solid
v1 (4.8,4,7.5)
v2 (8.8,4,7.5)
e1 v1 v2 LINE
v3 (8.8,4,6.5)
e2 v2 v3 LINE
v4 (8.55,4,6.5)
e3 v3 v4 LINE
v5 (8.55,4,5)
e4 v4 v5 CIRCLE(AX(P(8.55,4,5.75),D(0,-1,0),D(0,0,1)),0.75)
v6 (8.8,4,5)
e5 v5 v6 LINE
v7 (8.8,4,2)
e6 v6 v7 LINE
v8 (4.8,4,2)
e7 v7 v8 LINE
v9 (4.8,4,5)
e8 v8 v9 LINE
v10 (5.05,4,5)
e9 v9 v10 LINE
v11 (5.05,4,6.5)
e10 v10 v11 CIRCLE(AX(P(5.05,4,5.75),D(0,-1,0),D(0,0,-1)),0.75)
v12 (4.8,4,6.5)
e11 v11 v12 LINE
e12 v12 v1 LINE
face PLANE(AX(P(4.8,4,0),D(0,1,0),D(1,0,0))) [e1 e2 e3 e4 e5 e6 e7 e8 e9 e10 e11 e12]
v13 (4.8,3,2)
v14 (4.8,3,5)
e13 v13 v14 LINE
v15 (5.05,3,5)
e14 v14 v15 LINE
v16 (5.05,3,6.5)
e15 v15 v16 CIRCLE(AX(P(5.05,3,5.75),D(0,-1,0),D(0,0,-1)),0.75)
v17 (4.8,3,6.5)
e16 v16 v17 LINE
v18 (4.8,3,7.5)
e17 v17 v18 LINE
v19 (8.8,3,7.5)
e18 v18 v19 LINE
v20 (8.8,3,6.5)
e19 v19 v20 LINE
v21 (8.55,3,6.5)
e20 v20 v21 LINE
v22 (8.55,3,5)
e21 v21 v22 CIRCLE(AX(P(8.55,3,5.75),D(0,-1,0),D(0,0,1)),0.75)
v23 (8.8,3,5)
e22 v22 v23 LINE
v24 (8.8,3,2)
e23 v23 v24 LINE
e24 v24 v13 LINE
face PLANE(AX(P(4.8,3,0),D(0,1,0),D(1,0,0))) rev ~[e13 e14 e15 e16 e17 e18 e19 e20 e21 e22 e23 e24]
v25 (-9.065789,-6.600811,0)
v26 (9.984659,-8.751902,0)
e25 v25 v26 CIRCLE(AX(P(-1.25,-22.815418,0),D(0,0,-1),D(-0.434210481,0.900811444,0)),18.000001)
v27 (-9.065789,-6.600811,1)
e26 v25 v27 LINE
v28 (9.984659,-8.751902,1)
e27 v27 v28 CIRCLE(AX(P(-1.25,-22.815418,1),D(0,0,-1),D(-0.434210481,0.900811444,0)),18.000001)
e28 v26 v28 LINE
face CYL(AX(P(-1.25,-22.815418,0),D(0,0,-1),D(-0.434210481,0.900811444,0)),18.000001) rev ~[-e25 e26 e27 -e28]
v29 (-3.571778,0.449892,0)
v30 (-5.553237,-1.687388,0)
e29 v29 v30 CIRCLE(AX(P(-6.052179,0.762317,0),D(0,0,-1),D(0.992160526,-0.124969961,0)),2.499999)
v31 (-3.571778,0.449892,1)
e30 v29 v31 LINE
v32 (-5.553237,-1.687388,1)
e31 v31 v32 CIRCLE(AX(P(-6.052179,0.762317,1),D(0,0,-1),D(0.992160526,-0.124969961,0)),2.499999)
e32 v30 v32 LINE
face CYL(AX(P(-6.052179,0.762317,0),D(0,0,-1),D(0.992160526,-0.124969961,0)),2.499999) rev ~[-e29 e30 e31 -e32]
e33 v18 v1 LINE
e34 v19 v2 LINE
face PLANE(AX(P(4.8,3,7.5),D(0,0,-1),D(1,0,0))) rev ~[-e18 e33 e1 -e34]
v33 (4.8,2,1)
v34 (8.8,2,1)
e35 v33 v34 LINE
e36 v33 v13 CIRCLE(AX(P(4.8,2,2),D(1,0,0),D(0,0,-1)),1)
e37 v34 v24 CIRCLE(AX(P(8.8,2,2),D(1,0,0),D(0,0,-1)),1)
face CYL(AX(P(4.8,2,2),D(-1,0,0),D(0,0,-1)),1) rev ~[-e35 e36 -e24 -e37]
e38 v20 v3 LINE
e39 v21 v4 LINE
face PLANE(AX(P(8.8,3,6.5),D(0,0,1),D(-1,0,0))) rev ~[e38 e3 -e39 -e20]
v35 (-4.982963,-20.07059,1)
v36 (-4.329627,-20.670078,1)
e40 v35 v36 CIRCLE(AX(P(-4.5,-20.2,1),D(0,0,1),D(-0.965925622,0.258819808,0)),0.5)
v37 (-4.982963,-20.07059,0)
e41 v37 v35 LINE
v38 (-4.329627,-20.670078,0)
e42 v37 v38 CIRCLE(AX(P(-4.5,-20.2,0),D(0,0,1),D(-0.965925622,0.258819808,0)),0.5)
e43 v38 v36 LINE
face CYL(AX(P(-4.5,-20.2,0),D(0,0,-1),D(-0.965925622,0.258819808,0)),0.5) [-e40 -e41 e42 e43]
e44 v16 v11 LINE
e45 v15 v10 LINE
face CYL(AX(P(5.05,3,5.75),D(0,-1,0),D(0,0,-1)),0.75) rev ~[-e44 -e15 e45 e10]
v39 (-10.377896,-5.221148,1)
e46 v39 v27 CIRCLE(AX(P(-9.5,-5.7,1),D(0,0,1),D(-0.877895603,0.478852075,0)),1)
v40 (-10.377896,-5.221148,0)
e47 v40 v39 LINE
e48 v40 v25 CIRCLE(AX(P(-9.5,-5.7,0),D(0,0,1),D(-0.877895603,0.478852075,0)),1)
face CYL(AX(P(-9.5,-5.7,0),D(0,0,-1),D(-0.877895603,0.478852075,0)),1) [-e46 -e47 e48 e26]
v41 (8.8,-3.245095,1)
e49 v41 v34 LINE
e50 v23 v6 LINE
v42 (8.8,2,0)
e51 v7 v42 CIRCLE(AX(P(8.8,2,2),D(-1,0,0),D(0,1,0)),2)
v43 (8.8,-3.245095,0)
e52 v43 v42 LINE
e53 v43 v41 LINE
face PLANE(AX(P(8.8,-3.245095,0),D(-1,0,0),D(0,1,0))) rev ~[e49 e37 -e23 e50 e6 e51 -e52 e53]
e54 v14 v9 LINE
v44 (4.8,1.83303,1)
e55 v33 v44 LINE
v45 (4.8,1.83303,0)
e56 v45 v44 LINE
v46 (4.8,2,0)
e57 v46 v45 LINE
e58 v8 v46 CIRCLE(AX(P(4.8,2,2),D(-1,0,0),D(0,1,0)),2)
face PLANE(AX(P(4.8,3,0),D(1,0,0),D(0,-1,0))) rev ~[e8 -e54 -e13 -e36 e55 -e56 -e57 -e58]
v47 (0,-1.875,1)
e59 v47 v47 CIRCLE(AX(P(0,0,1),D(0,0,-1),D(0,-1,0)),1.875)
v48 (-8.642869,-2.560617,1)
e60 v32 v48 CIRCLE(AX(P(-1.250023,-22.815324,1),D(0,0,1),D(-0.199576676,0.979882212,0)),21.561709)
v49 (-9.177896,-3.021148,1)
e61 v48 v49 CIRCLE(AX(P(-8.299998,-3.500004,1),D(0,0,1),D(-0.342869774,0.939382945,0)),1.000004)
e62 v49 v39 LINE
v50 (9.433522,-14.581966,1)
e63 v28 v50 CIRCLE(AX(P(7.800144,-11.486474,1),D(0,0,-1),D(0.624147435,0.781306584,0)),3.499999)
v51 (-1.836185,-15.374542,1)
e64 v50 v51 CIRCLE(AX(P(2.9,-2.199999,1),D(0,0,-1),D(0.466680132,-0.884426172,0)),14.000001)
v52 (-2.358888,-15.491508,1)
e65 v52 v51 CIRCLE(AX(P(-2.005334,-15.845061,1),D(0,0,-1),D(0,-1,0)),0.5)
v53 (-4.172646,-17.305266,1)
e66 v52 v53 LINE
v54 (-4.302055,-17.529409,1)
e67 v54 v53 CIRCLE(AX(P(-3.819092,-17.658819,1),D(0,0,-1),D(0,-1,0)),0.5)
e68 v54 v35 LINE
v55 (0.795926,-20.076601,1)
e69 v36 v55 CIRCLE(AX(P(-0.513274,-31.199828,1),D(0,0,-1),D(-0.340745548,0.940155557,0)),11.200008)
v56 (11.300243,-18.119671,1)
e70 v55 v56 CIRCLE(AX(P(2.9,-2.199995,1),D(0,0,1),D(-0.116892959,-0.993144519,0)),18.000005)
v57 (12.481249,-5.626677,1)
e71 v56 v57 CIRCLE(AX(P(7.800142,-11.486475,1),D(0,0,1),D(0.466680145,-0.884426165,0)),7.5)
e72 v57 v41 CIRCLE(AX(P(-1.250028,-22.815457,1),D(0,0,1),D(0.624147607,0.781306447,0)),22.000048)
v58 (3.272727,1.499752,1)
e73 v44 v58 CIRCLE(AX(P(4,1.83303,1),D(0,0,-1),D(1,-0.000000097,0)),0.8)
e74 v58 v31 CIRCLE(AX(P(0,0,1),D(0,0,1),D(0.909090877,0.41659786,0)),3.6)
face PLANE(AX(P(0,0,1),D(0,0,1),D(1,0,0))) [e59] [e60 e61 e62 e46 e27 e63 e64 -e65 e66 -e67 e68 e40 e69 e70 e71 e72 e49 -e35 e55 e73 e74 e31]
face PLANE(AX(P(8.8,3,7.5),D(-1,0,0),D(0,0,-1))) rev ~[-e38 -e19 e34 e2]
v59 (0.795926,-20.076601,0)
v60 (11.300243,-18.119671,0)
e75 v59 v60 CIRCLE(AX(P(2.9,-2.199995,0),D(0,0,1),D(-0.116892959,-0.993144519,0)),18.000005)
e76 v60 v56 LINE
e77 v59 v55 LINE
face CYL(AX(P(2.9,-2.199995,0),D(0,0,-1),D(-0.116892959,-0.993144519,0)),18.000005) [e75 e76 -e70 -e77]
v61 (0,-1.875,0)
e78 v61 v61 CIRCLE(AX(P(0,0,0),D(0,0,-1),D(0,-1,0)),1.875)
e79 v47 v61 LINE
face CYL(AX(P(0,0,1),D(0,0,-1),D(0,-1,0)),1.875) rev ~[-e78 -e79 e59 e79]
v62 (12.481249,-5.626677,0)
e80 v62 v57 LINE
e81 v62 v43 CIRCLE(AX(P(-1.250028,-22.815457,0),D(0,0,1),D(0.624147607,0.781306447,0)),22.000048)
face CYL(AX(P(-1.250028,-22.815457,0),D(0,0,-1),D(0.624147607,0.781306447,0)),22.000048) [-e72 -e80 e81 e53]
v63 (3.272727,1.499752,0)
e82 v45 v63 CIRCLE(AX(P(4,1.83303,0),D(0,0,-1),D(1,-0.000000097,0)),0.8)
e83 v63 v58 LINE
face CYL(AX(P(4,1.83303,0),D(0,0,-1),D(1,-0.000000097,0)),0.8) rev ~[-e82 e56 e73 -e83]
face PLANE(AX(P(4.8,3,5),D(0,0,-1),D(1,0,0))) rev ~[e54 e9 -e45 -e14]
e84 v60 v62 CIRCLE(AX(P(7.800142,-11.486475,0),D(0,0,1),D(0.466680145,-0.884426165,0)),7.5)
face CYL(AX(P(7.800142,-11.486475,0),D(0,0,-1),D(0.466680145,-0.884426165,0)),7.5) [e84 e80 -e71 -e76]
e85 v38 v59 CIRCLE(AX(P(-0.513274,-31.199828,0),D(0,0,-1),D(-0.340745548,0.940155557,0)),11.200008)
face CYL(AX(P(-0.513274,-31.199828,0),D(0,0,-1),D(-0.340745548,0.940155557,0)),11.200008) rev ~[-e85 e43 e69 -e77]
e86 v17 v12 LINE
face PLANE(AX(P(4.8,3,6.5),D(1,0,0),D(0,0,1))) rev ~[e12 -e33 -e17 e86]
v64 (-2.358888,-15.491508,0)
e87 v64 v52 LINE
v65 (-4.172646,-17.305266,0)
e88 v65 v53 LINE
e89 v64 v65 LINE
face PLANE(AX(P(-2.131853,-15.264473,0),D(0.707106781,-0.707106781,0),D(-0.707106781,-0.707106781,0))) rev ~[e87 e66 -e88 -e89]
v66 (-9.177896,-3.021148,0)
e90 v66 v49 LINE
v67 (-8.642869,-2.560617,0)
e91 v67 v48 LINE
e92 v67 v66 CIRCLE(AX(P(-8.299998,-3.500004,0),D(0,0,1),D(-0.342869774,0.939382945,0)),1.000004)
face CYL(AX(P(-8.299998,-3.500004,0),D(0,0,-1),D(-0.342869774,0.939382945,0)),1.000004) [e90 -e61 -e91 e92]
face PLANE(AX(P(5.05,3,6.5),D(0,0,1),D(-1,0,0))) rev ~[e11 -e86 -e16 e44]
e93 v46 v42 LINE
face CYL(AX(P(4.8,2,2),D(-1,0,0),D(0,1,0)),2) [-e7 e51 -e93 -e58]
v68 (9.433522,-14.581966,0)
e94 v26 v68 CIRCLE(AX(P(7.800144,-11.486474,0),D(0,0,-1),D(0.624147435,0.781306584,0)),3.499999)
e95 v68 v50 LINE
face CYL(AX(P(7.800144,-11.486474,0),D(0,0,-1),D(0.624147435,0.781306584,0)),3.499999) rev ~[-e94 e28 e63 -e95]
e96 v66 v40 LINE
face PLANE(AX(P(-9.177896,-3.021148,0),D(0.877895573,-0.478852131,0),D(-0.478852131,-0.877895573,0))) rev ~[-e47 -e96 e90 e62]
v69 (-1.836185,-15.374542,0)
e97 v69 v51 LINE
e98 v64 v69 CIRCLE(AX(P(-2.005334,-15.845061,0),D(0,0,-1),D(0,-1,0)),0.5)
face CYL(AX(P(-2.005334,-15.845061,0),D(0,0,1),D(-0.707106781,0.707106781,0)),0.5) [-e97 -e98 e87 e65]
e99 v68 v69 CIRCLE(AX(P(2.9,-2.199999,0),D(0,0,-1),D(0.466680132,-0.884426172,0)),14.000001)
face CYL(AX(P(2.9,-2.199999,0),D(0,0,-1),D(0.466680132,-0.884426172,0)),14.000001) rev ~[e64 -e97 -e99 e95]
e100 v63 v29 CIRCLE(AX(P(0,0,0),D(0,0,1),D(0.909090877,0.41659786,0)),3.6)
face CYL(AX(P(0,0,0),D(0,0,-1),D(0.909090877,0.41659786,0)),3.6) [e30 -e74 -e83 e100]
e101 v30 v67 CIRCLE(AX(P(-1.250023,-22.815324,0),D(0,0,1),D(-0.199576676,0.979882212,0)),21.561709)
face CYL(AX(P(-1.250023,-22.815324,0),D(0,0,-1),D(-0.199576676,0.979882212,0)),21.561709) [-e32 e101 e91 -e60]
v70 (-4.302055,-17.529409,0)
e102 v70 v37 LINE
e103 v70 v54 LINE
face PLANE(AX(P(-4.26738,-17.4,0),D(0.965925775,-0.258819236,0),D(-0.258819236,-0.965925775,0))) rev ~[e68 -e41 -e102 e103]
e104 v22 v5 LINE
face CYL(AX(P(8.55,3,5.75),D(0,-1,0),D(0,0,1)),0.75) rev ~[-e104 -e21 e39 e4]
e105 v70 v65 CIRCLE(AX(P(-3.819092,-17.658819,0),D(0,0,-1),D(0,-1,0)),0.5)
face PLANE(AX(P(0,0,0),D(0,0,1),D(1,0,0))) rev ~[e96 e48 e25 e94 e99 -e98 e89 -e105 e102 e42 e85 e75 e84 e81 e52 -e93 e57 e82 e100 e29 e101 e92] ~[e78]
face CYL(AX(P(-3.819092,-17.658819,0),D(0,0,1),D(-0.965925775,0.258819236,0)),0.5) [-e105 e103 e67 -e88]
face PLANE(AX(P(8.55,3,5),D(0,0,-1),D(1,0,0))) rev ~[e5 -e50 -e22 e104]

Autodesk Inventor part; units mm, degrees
ref_plane "YZ Plane" through (0, 0, 0) normal (1, 0, 0) x (0, 1, 0)
ref_plane "XZ Plane" through (0, 0, 0) normal (0, 1, 0) x (-1, 0, 0)
ref_plane "XY Plane" through (0, 0, 0) normal (0, 0, 1) x (1, 0, 0)
sketch "Sketch1 outline for Plate1" plane through (0, 0, 0) normal (0, 0, 1) x (1, 0, 0)
  arc A0 (-4.982963, -20.07059) -> (-4.329627, -20.670078) centre (-4.5, -20.2) ccw
  arc A1 (-4.329627, -20.670078) -> (0.795926, -20.076601) centre (-0.513276, -31.19982) cw
  arc A2 (0.795926, -20.076601) -> (11.300243, -18.119671) centre (2.9, -2.2) ccw
  arc A3 (11.300243, -18.119671) -> (12.481249, -5.626677) centre (7.800142, -11.486475) ccw
  arc A4 (12.481249, -5.626677) -> (8.8, -3.245095) centre (-1.25, -22.815417) ccw
  line L0 (8.8, -3.245095) -> (8.8, 3)
  line L1 (8.8, 3) -> (4.8, 3)
  line L2 (4.8, 3) -> (4.8, 1.83303)
  arc A5 (4.8, 1.83303) -> (3.272727, 1.499752) centre (4, 1.83303) cw
  arc A6 (3.272727, 1.499752) -> (-3.571778, 0.449892) centre (0, 0) ccw
  arc A7 (-3.571778, 0.449892) -> (-5.553237, -1.687388) centre (-6.052179, 0.762317) cw
  arc A8 (-5.553237, -1.687388) -> (-8.642869, -2.560617) centre (-1.25, -22.815417) ccw
  arc A9 (-8.642869, -2.560617) -> (-9.177896, -3.021148) centre (-8.3, -3.5) ccw
  line L3 (-9.177896, -3.021148) -> (-10.377896, -5.221148)
  arc A10 (-10.377896, -5.221148) -> (-9.065789, -6.600811) centre (-9.5, -5.7) ccw
  arc A11 (-9.065789, -6.600811) -> (9.984659, -8.751902) centre (-1.25, -22.815417) cw
  arc A12 (9.984659, -8.751902) -> (9.433522, -14.581966) centre (7.800142, -11.486475) cw
  arc A13 (9.433522, -14.581966) -> (-2.131853, -15.264473) centre (2.9, -2.2) cw
  line L4 (-2.131853, -15.264473) -> (-4.26738, -17.4)
  line L5 (-4.26738, -17.4) -> (-4.982963, -20.07059)
extrude "Plate1" add sketch "Sketch1 outline for Plate1" along normal blind 1
sketch "Sketch2 outline for Plate2" plane through (4.8, 3, 0) normal (0, 1, 0) x (1, 0, 0)
  line L0 (4, -5) -> (4, 0)
  line L1 (3.75, -5) -> (4, -5)
  arc A0 (3.75, -6.5) -> (3.75, -5) centre (3.75, -5.75) cw
  line L2 (4, -6.5) -> (3.75, -6.5)
  line L3 (4, -7.5) -> (4, -6.5)
  line L4 (0, -7.5) -> (4, -7.5)
  line L5 (0, -6.5) -> (0, -7.5)
  line L6 (0.25, -6.5) -> (0, -6.5)
  arc A1 (0.25, -5) -> (0.25, -6.5) centre (0.25, -5.75) cw
  line L7 (0, -5) -> (0.25, -5)
  line L8 (0, 0) -> (0, -5)
  line L9 (4, 0) -> (0, 0)
sheet face with bend "Face2" sketch "Sketch2 outline for Plate2" thickness 1 toward (0, 1, 0) bend radius 1
bend "Bend1"
sketch "Sketch1" plane through (0, 0, 0) normal (0, 0, 1) x (1, 0, 0)
  arc A0 (3.272727, 1.499752) -> (-3.571778, 0.449892) centre (0, 0) ccw
  circle A1 centre (-8.3, -3.5) radius 1
  circle A2 centre (-9.5, -5.7) radius 1
  circle A3 centre (-4.5, -20.2) radius 0.5
  arc A4 (9.984659, -8.751902) -> (-9.065789, -6.600811) centre (-1.25, -22.815417) ccw
  line L0 (0, 0) -> (0, -25.191235) construction
  line L1 (-4.982963, -20.07059) -> (-4.26738, -17.4)
  line L2 (-4.26738, -17.4) -> (-2.131853, -15.264473)
  line L3 (-4.26738, -17.4) -> (1.767607, -17.4) construction
  arc A5 (-2.131853, -15.264473) -> (9.433522, -14.581966) centre (2.9, -2.2) ccw
  arc A6 (9.433522, -14.581966) -> (9.984659, -8.751902) centre (7.800142, -11.486475) ccw
  arc A7 (-5.553237, -1.687388) -> (-8.642869, -2.560617) centre (-1.25, -22.815417) ccw
  arc A8 (0.795926, -20.076601) -> (11.300243, -18.119671) centre (2.9, -2.2) ccw
  arc A9 (11.300243, -18.119671) -> (12.481249, -5.626677) centre (7.800142, -11.486475) ccw
  arc A10 (12.481249, -5.626677) -> (8.8, -3.245095) centre (-1.25, -22.815417) ccw
  line L4 (-10.377896, -5.221148) -> (-9.177896, -3.021148)
  arc A11 (0.795926, -20.076601) -> (-4.329627, -20.670078) centre (-0.513276, -31.19982) ccw
  arc A12 (-5.553237, -1.687388) -> (-3.571778, 0.449892) centre (-6.052179, 0.762317) ccw
  line L5 (4.8, 3) -> (8.8, 3)
  line L6 (8.8, 3) -> (8.8, -3.245095)
  arc A13 (3.272727, 1.499752) -> (4.8, 1.83303) centre (4, 1.83303) ccw
  line L7 (4.8, 3) -> (4.8, 1.83303)
  dimension "d34" = 7.2
  dimension "d35" = 2
  dimension "d36" = 8.3
  dimension "d37" = 9.5
  dimension "d38" = 3.5
  dimension "d39" = 5.7
  dimension "d40" = 1
  dimension "d41" = 20.2
  dimension "d42" = 4.5
  dimension "d43" = 1.25
  dimension "d44" = 22.81542
  dimension "d45" = 18
  dimension "d46" = 15
  dimension "d47" = 17.4
  dimension "d48" = 45
  dimension "d49" = 2.9
  dimension "d50" = 2.2
  dimension "d51" = 14
  dimension "d52" = 3.5
  dimension "d53" = 4
  dimension "d54" = 11.2
  dimension "d55" = 2.5
  dimension "d56" = 8.8
  dimension "d57" = 4
  dimension "d58" = 3
  dimension "d59" = 1.6
  dimension "d60" = 18
  dimension "d61" = 22
sketch "Sketch2" plane through (4.8, 3, 0) normal (0, 1, 0) x (1, 0, 0)
  line L0 (4, 0) -> (0, 0)
  line L1 (4, 0) -> (0, 0)
  line L2 (0, 0) -> (0, -7.5)
  line L3 (0, -7.5) -> (4, -7.5)
  line L4 (4, -7.5) -> (4, 0)
  line L5 (0, -6.5) -> (0.25, -6.5)
  arc A0 (0.25, -6.5) -> (0.25, -5) centre (0.25, -5.75) ccw
  line L6 (0.25, -5) -> (0, -5)
  line L7 (4, -6.5) -> (3.75, -6.5)
  arc A1 (3.75, -5) -> (3.75, -6.5) centre (3.75, -5.75) ccw
  line L8 (3.75, -5) -> (4, -5)
  line L9 (0, -1) -> (4, -1)
  point P0 (-4.8, 0)
  dimension "d65" = 0.75
  dimension "d66" = 3.5
  dimension "d84" = 6.5
  dimension "d85" = 4.75
hole "Hole1" at (0, 0, 1) direction (0, 0, -1) diameter 3.75 end through all
fillet "Fillet1" radius 0.5 2 edges at (-4.2674, -17.4, 0.5) (-2.1319, -15.2645, 0.5)
equation "\"d81\" = Thickness"
equation "\"d86\" = Thickness"
equation "\"d69\" = BendRadius"
equation "\"d70\" = BendReliefWidth"
equation "\"d72\" = MinimumRemnant"
equation "\"d71\" = BendReliefDepth"
equation "\"d73\" = BendRadius"
equation "\"BendRadius\" = Thickness"
equation "\"BendReliefWidth\" = Thickness"
equation "\"BendReliefDepth\" = 0.5 * Thickness"
equation "\"CornerReliefSize\" = 4 * Thickness"
equation "\"MinimumRemnant\" = 2 * Thickness"
equation "\"TransitionRadius\" = BendRadius"
equation "\"JacobiRadiusSize\" = BendRadius"
equation "\"GapSize\" = Thickness"
equation "\"d62\" = BendRadius"
equation "\"Thickness\" = 1"
properties part number "403-08" material "Aluminum-6061"
